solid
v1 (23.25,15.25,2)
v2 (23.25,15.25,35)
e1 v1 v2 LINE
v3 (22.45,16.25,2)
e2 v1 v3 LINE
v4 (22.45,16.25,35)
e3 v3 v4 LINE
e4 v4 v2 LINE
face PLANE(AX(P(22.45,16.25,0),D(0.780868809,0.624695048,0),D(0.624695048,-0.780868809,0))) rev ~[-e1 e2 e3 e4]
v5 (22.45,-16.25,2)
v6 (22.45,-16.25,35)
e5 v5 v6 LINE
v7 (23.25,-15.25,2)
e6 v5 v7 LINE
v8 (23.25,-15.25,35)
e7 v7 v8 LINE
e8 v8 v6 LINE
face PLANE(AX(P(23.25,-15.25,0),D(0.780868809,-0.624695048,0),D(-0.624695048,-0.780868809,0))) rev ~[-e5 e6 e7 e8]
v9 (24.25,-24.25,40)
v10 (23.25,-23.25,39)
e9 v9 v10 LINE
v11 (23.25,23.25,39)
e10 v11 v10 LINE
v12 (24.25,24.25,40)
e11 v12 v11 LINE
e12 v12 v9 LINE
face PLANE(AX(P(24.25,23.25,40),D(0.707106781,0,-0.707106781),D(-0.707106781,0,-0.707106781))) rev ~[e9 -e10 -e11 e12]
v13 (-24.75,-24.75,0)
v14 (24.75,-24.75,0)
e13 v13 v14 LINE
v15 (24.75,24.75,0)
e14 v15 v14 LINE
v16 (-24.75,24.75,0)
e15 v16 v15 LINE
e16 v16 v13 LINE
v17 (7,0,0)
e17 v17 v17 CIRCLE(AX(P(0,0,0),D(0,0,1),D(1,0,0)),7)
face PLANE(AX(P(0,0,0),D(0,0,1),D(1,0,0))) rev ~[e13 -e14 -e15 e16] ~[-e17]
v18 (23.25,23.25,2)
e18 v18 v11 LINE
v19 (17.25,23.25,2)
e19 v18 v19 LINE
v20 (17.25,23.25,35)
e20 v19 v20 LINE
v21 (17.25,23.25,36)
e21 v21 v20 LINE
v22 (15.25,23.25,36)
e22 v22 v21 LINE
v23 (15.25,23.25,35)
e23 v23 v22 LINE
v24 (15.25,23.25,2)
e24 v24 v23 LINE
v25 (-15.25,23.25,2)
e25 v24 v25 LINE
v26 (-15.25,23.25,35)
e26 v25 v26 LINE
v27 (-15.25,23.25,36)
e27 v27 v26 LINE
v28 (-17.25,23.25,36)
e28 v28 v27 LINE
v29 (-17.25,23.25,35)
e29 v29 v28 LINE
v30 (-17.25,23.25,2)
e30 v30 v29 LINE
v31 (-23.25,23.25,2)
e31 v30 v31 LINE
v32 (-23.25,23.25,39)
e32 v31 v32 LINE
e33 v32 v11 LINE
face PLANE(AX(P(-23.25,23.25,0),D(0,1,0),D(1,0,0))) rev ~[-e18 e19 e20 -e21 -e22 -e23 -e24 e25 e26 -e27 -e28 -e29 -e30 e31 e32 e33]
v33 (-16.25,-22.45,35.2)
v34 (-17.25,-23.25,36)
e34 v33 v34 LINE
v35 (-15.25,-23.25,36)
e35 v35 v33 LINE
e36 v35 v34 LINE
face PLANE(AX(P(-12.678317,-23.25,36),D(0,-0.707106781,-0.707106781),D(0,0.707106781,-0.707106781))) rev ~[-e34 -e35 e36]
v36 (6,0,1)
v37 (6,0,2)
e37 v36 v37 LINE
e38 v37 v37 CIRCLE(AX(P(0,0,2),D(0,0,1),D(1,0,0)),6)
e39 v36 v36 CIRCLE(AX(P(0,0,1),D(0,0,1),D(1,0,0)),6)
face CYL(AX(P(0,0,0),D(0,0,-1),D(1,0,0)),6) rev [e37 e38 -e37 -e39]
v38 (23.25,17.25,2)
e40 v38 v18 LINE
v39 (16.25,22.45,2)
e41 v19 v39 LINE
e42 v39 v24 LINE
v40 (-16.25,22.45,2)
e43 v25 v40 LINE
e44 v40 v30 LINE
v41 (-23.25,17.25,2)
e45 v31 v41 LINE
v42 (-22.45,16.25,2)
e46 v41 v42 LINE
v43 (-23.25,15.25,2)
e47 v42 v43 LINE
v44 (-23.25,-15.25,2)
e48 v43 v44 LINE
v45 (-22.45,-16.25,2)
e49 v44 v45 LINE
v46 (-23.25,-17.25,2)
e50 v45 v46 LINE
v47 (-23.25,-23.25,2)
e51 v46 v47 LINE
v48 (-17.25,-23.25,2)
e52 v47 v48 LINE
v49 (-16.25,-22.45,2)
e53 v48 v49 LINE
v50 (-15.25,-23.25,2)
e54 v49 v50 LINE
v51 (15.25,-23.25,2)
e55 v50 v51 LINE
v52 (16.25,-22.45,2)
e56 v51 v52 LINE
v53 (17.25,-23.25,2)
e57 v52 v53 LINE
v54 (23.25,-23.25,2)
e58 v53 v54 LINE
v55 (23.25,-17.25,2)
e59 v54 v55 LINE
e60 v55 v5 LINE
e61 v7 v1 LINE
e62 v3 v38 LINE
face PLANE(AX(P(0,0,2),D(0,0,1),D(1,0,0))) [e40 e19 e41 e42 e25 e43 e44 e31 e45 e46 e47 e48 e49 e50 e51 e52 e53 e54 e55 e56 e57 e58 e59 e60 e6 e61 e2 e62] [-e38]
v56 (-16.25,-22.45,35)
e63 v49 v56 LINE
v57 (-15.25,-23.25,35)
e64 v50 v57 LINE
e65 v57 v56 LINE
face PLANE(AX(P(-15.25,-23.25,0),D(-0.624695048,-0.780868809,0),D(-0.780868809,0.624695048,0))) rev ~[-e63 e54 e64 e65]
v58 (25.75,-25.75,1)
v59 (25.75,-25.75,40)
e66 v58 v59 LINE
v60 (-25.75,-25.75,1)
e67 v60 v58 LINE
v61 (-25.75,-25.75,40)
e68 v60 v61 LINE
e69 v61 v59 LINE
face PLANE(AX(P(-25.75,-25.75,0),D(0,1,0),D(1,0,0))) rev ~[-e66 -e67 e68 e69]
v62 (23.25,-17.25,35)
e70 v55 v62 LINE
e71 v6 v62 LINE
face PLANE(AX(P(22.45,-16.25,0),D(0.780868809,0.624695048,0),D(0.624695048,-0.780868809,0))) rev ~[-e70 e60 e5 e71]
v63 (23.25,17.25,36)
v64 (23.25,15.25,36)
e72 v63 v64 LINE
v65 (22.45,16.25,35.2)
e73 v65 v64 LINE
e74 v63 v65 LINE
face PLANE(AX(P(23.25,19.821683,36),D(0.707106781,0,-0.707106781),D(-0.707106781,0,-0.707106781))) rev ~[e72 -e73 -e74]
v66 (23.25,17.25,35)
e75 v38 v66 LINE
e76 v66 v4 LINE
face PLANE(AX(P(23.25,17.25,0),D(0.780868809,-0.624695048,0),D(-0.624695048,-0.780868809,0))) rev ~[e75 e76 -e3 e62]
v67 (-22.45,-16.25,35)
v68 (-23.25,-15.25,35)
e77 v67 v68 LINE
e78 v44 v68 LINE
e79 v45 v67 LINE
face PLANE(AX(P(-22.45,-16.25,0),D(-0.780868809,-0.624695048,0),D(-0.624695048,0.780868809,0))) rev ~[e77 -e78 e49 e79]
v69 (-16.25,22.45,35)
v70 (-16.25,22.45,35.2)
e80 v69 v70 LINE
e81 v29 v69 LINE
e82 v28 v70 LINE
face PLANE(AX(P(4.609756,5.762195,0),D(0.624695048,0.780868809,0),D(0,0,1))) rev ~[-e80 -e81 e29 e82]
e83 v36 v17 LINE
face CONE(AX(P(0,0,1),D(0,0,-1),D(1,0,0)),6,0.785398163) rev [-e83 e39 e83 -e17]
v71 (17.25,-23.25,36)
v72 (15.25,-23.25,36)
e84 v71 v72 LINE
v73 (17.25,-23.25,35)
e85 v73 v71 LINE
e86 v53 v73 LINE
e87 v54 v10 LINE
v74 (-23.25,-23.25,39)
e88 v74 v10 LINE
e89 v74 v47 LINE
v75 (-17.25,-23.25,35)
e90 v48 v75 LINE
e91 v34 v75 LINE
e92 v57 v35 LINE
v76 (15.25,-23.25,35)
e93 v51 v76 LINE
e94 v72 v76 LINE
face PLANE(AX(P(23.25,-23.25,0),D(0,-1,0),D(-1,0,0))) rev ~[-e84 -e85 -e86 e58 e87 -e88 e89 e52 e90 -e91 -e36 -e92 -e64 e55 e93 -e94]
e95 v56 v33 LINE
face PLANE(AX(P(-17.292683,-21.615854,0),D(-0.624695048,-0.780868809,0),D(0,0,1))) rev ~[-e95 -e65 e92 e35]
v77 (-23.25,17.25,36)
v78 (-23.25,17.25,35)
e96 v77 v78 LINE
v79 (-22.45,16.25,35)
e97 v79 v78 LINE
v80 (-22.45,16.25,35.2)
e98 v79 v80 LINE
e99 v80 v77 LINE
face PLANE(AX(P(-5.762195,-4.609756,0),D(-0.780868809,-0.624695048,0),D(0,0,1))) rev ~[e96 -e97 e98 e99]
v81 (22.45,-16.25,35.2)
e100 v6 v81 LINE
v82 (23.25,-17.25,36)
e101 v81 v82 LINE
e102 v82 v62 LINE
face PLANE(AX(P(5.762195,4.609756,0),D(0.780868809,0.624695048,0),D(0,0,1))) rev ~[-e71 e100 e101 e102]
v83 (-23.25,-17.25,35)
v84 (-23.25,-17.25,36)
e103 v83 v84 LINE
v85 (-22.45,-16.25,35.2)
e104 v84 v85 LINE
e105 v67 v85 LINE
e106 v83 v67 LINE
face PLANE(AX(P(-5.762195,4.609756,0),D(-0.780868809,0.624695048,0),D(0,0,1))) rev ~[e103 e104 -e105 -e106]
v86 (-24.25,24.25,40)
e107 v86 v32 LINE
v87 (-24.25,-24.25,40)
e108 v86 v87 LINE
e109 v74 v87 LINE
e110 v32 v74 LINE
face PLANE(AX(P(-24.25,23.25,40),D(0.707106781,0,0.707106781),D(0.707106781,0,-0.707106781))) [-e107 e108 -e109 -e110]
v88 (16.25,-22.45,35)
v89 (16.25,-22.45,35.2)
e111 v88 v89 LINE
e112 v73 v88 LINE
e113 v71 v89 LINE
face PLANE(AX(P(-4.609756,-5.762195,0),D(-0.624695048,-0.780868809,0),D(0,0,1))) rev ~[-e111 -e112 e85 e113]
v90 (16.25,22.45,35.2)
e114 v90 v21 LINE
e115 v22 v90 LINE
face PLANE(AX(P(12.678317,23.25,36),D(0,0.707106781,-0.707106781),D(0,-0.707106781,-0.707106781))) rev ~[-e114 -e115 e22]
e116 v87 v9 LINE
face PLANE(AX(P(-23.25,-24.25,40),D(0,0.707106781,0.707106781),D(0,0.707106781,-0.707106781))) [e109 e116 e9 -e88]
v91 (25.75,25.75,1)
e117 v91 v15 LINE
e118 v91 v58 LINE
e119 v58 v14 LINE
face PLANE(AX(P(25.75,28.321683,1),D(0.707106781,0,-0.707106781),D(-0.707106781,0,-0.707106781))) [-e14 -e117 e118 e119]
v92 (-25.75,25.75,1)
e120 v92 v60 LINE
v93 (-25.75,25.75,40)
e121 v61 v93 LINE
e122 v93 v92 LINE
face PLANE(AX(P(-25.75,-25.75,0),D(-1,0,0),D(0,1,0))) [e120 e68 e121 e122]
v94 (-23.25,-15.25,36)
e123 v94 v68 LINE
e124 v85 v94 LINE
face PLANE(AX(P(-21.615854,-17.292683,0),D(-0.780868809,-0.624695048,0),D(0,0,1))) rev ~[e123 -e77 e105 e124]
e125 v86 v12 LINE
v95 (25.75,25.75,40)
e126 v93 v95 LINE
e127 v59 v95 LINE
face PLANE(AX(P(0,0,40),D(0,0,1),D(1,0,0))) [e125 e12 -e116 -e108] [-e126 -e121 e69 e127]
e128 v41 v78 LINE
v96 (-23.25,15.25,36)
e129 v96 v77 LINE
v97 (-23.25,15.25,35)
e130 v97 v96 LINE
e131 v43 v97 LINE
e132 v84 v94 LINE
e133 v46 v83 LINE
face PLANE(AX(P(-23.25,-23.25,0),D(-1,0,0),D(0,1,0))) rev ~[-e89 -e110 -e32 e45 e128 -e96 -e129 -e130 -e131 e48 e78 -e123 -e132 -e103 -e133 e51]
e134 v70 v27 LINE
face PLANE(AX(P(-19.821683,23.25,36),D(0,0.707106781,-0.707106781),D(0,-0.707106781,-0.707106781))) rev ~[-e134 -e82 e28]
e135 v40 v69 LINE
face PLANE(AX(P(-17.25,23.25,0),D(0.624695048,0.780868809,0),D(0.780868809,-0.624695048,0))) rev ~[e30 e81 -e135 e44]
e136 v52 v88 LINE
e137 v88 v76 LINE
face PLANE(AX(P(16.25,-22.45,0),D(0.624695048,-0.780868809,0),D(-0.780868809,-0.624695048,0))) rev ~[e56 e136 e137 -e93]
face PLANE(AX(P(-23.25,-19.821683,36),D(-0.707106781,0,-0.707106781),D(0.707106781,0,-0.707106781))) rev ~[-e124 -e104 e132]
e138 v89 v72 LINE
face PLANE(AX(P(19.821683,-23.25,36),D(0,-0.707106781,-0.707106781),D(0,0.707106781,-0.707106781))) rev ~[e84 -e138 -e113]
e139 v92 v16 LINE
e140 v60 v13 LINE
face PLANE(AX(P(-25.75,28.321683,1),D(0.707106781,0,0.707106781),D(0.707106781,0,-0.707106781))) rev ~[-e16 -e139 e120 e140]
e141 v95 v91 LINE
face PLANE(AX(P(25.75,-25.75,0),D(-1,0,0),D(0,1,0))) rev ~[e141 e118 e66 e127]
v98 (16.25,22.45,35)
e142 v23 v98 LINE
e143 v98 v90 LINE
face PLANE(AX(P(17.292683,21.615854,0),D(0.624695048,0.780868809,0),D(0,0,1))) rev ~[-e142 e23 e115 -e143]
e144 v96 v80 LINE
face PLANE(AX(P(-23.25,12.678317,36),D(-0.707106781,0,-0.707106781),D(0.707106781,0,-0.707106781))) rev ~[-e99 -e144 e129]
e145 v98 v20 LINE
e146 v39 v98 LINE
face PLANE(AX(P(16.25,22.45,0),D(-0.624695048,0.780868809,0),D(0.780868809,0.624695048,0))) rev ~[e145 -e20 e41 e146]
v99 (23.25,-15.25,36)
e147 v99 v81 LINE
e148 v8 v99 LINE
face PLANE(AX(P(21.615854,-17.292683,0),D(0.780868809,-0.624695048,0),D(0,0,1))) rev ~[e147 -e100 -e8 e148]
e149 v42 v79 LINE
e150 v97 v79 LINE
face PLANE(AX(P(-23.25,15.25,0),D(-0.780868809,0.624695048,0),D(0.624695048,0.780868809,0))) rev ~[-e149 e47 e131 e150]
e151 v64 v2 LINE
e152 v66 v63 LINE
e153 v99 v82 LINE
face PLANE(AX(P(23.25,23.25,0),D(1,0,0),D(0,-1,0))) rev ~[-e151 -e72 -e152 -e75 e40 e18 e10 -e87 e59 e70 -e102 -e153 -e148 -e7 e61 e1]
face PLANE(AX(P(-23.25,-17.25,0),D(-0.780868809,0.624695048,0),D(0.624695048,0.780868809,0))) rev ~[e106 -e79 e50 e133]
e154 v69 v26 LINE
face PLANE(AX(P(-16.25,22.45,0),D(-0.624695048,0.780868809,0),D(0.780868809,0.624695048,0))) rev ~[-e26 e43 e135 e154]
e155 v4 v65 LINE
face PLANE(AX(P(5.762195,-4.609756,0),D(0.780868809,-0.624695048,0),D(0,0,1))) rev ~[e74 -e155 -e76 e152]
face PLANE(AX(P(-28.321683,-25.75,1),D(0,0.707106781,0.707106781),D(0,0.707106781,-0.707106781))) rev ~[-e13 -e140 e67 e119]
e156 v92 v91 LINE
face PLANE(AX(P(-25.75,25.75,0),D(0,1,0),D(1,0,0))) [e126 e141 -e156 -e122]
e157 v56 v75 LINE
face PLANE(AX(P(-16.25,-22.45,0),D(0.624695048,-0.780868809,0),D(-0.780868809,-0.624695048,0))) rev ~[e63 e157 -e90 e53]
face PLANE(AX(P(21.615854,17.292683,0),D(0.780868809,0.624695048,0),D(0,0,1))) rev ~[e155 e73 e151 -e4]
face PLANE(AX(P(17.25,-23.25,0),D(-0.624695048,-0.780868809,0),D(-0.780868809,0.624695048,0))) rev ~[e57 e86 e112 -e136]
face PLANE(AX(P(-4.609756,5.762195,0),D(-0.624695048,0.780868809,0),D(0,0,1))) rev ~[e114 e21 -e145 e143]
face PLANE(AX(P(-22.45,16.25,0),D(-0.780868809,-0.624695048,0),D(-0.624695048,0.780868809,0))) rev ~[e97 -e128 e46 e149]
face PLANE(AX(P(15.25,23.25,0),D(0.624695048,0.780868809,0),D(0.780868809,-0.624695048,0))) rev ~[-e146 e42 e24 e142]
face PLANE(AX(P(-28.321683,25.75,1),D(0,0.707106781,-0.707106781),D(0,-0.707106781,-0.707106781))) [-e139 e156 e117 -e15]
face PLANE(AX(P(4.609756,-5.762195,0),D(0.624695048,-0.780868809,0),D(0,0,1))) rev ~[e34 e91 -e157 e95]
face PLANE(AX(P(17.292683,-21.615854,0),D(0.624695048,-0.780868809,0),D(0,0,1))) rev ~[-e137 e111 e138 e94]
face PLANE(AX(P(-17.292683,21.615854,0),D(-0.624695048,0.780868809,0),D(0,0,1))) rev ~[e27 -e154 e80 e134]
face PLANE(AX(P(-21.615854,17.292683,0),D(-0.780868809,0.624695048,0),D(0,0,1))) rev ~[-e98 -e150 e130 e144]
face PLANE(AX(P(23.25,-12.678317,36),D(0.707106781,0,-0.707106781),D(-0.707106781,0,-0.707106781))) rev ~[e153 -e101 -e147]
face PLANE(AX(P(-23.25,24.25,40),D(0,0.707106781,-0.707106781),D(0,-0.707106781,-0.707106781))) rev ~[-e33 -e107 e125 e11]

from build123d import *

# Parameters (mm, degrees)
F0_W          = 51.5
F0_H          = 51.5
F1_DEPTH      = 40
F2_DEPTH      = 35
F0_R          = 6
F3_DEPTH      = 2
F4_T4_DEPTH   = 7.1433659759
F4_T10_DEPTH  = 7.1433659759
F4_T16_DEPTH  = 7.1433659759
F4_T22_DEPTH  = 7.1433659759
F4_T28_DEPTH  = 7.1433659759
F4_T34_DEPTH  = 7.1433659759
F4_T40_DEPTH  = 7.1433659759
F4_T46_DEPTH  = 7.1433659759
F4_T49_DEPTH  = 46.5
F4_T51_DEPTH  = 46.5
F4_T53_DEPTH  = 56.6433659759
F4_T55_DEPTH  = 56.6433659759
F4_T63_DEPTH  = 49.071682988
F4_T67_DEPTH  = 49.071682988
F4_T74_DEPTH  = 49.071682988
F4_T78_DEPTH  = 49.071682988
F4_T85_DEPTH  = 49.071682988
F4_T89_DEPTH  = 49.071682988
F4_T96_DEPTH  = 49.071682988
F4_T100_DEPTH = 49.071682988


# Not quite as in the source:
# - a fillet or chamfer that OpenCascade refuses, or shapes differently, is made with other operations: its cross-section is extruded or revolved along the edge and cut away or added


with BuildPart() as f1:
    # F0 (on Top) → F1 (new body)
    with BuildSketch(Plane.XY):
        Rectangle(F0_W, F0_H)
        Polygon((-23.25, 17.25), (-23.25, 23.25), (-17.25, 23.25), (-15.25, 23.25), (15.25, 23.25), (17.25, 23.25), (23.25, 23.25), (23.25, 17.25), (23.25, 15.25), (23.25, -15.25), (23.25, -17.25), (23.25, -23.25), (17.25, -23.25), (15.25, -23.25), (-15.25, -23.25), (-17.25, -23.25), (-23.25, -23.25), (-23.25, -17.25), (-23.25, -15.25), (-23.25, 15.25), align=None, mode=Mode.SUBTRACT)
    extrude(amount=F1_DEPTH)

    # F0 (on Top) → F2 (join)
    with BuildSketch(Plane.XY):
        Rectangle(F0_W, F0_H)
        Polygon((-23.25, 17.25), (-23.25, 23.25), (-17.25, 23.25), (-15.25, 23.25), (15.25, 23.25), (17.25, 23.25), (23.25, 23.25), (23.25, 17.25), (23.25, 15.25), (23.25, -15.25), (23.25, -17.25), (23.25, -23.25), (17.25, -23.25), (15.25, -23.25), (-15.25, -23.25), (-17.25, -23.25), (-23.25, -23.25), (-23.25, -17.25), (-23.25, -15.25), (-23.25, 15.25), align=None, mode=Mode.SUBTRACT)
        Polygon((-22.45, 16.25), (-23.25, 17.25), (-23.25, 15.25), align=None)
        Polygon((-15.25, 23.25), (-17.25, 23.25), (-16.25, 22.45), align=None)
        Polygon((17.25, 23.25), (15.25, 23.25), (16.25, 22.45), align=None)
        Polygon((23.25, 15.25), (23.25, 17.25), (22.45, 16.25), align=None)
        Polygon((23.25, -17.25), (23.25, -15.25), (22.45, -16.25), align=None)
        Polygon((16.25, -22.45), (15.25, -23.25), (17.25, -23.25), align=None)
        Polygon((-16.25, -22.45), (-17.25, -23.25), (-15.25, -23.25), align=None)
        Polygon((-22.45, -16.25), (-23.25, -15.25), (-23.25, -17.25), align=None)
    extrude(amount=F2_DEPTH)

    # F0 (on Top) → F3 (join)
    with BuildSketch(Plane.XY):
        Polygon((-17.25, 23.25), (-23.25, 23.25), (-23.25, 17.25), (-22.45, 16.25), (-23.25, 15.25), (-23.25, -15.25), (-22.45, -16.25), (-23.25, -17.25), (-23.25, -23.25), (-17.25, -23.25), (-16.25, -22.45), (-15.25, -23.25), (15.25, -23.25), (16.25, -22.45), (17.25, -23.25), (23.25, -23.25), (23.25, -17.25), (22.45, -16.25), (23.25, -15.25), (23.25, 15.25), (22.45, 16.25), (23.25, 17.25), (23.25, 23.25), (17.25, 23.25), (16.25, 22.45), (15.25, 23.25), (-15.25, 23.25), (-16.25, 22.45), align=None)
        Circle(F0_R, mode=Mode.SUBTRACT)
    extrude(amount=F3_DEPTH)

    # F4: chamfer of 1 on 17 edges, made by hand


with BuildPart() as f4_tool2:
    # F4_s3 → F4_t4 (new body)
    with BuildSketch(Plane.YZ.offset(12.678317012)):
        Polygon((23.25, 36), (22.25, 35), (23.25, 35), align=None)
    extrude(amount=F4_T4_DEPTH)

    split(bisect_by=Plane(origin=(17.2926829268, 21.6158536585, 0), x_dir=(0, 0, 1), z_dir=(0.6246950476, 0.7808688094, 0)), keep=Keep.TOP)

    split(bisect_by=Plane(origin=(-4.6097560976, 5.762195122, 0), x_dir=(0, 0, 1), z_dir=(-0.6246950476, 0.7808688094, 0)), keep=Keep.TOP)


with BuildPart() as f1_1:
    add(f1.part)

    # F4_t1: union F4_tool2
    add(f4_tool2.part)


with BuildPart() as f4_tool8:
    # F4_s9 → F4_t10 (new body)
    with BuildSketch(Plane.YZ.offset(-19.821682988)):
        Polygon((23.25, 36), (22.25, 35), (23.25, 35), align=None)
    extrude(amount=F4_T10_DEPTH)

    split(bisect_by=Plane(origin=(4.6097560976, 5.762195122, 0), x_dir=(0, 0, 1), z_dir=(0.6246950476, 0.7808688094, 0)), keep=Keep.TOP)

    split(bisect_by=Plane(origin=(-17.2926829268, 21.6158536585, 0), x_dir=(0, 0, 1), z_dir=(-0.6246950476, 0.7808688094, 0)), keep=Keep.TOP)


with BuildPart() as f1_2:
    add(f1_1.part)

    # F4_t7: union F4_tool8
    add(f4_tool8.part)


with BuildPart() as f4_tool14:
    # F4_s15 → F4_t16 (new body)
    with BuildSketch(Plane.XZ.offset(12.678317012)):
        Polygon((23.25, 36), (22.25, 35), (23.25, 35), align=None)
    extrude(amount=F4_T16_DEPTH)

    split(bisect_by=Plane(origin=(21.6158536585, -17.2926829268, 0), x_dir=(0, 0, 1), z_dir=(0.7808688094, -0.6246950476, 0)), keep=Keep.TOP)

    split(bisect_by=Plane(origin=(5.762195122, 4.6097560976, 0), x_dir=(0, 0, 1), z_dir=(0.7808688094, 0.6246950476, 0)), keep=Keep.TOP)


with BuildPart() as f1_3:
    add(f1_2.part)

    # F4_t13: union F4_tool14
    add(f4_tool14.part)


with BuildPart() as f4_tool20:
    # F4_s21 → F4_t22 (new body)
    with BuildSketch(Plane.XZ.offset(-19.821682988)):
        Polygon((23.25, 36), (22.25, 35), (23.25, 35), align=None)
    extrude(amount=F4_T22_DEPTH)

    split(bisect_by=Plane(origin=(5.762195122, -4.6097560976, 0), x_dir=(0, 0, 1), z_dir=(0.7808688094, -0.6246950476, 0)), keep=Keep.TOP)

    split(bisect_by=Plane(origin=(21.6158536585, 17.2926829268, 0), x_dir=(0, 0, 1), z_dir=(0.7808688094, 0.6246950476, 0)), keep=Keep.TOP)


with BuildPart() as f1_4:
    add(f1_3.part)

    # F4_t19: union F4_tool20
    add(f4_tool20.part)


with BuildPart() as f4_tool26:
    # F4_s27 → F4_t28 (new body)
    with BuildSketch(Plane.XZ.offset(-12.678317012)):
        Polygon((-23.25, 36), (-22.25, 35), (-23.25, 35), align=None)
    extrude(amount=-F4_T28_DEPTH)

    split(bisect_by=Plane(origin=(-21.6158536585, 17.2926829268, 0), x_dir=(0, 0, 1), z_dir=(-0.7808688094, 0.6246950476, 0)), keep=Keep.TOP)

    split(bisect_by=Plane(origin=(-5.762195122, -4.6097560976, 0), x_dir=(0, 0, 1), z_dir=(-0.7808688094, -0.6246950476, 0)), keep=Keep.TOP)


with BuildPart() as f1_5:
    add(f1_4.part)

    # F4_t25: union F4_tool26
    add(f4_tool26.part)


with BuildPart() as f4_tool32:
    # F4_s33 → F4_t34 (new body)
    with BuildSketch(Plane.XZ.offset(19.821682988)):
        Polygon((-23.25, 36), (-22.25, 35), (-23.25, 35), align=None)
    extrude(amount=-F4_T34_DEPTH)

    split(bisect_by=Plane(origin=(-5.762195122, 4.6097560976, 0), x_dir=(0, 0, 1), z_dir=(-0.7808688094, 0.6246950476, 0)), keep=Keep.TOP)

    split(bisect_by=Plane(origin=(-21.6158536585, -17.2926829268, 0), x_dir=(0, 0, 1), z_dir=(-0.7808688094, -0.6246950476, 0)), keep=Keep.TOP)


with BuildPart() as f1_6:
    add(f1_5.part)

    # F4_t31: union F4_tool32
    add(f4_tool32.part)


with BuildPart() as f4_tool38:
    # F4_s39 → F4_t40 (new body)
    with BuildSketch(Plane.YZ.offset(-12.678317012)):
        Polygon((-23.25, 36), (-22.25, 35), (-23.25, 35), align=None)
    extrude(amount=-F4_T40_DEPTH)

    split(bisect_by=Plane(origin=(-17.2926829268, -21.6158536585, 0), x_dir=(0, 0, 1), z_dir=(-0.6246950476, -0.7808688094, 0)), keep=Keep.TOP)

    split(bisect_by=Plane(origin=(4.6097560976, -5.762195122, 0), x_dir=(0, 0, 1), z_dir=(0.6246950476, -0.7808688094, 0)), keep=Keep.TOP)


with BuildPart() as f1_7:
    add(f1_6.part)

    # F4_t37: union F4_tool38
    add(f4_tool38.part)


with BuildPart() as f4_tool44:
    # F4_s45 → F4_t46 (new body)
    with BuildSketch(Plane.YZ.offset(19.821682988)):
        Polygon((-23.25, 36), (-22.25, 35), (-23.25, 35), align=None)
    extrude(amount=-F4_T46_DEPTH)

    split(bisect_by=Plane(origin=(-4.6097560976, -5.762195122, 0), x_dir=(0, 0, 1), z_dir=(-0.6246950476, -0.7808688094, 0)), keep=Keep.TOP)

    split(bisect_by=Plane(origin=(17.2926829268, -21.6158536585, 0), x_dir=(0, 0, 1), z_dir=(0.6246950476, -0.7808688094, 0)), keep=Keep.TOP)


with BuildPart() as f1_8:
    add(f1_7.part)

    # F4_t43: union F4_tool44
    add(f4_tool44.part)

    # F4_s50 → F4_t49 (cut)
    with BuildSketch(Plane.YZ.offset(-23.25)):
        Polygon((24.25, 40), (23.25, 39), (23.25, 40), align=None)
        Polygon((-24.25, 40), (-23.25, 39), (-23.25, 40), align=None)
    extrude(amount=F4_T49_DEPTH, mode=Mode.SUBTRACT)

    # F4_s52 → F4_t51 (cut)
    with BuildSketch(Plane.XZ.offset(-23.25)):
        Polygon((-24.25, 40), (-23.25, 39), (-23.25, 40), align=None)
        Polygon((24.25, 40), (23.25, 39), (23.25, 40), align=None)
    extrude(amount=F4_T51_DEPTH, mode=Mode.SUBTRACT)

    # F4_s54 → F4_t53 (cut)
    with BuildSketch(Plane.YZ.offset(-28.321682988)):
        Polygon((25.75, 1), (24.75, 0), (25.75, 0), align=None)
        Polygon((-25.75, 1), (-24.75, 0), (-25.75, 0), align=None)
    extrude(amount=F4_T53_DEPTH, mode=Mode.SUBTRACT)

    # F4_s56 → F4_t55 (cut)
    with BuildSketch(Plane.XZ.offset(-28.321682988)):
        Polygon((-25.75, 1), (-24.75, 0), (-25.75, 0), align=None)
        Polygon((25.75, 1), (24.75, 0), (25.75, 0), align=None)
    extrude(amount=F4_T55_DEPTH, mode=Mode.SUBTRACT)

    # F4_s57 → F4_t58 (revolve, cut)
    with BuildSketch(Plane.XZ):
        Polygon((6, 1), (7, 0), (6, 0), align=None)
    revolve(axis=Axis((0, 0, 0), (0, 0, 1)), mode=Mode.SUBTRACT)


with BuildPart() as f4_tool61:
    # F4_s62 → F4_t63 (new body)
    with BuildSketch(Plane.YZ.offset(25.821682988)):
        Polygon((24.25, 40), (23.25, 39), (23.25, 40), align=None)
    extrude(amount=-F4_T63_DEPTH)

    split(bisect_by=Plane.YZ.offset(23.25), keep=Keep.TOP)


with BuildPart() as f4_tool65:
    # F4_s66 → F4_t67 (new body)
    with BuildSketch(Plane.XZ.offset(23.25)):
        Polygon((24.25, 40), (23.25, 39), (23.25, 40), align=None)
    extrude(amount=-F4_T67_DEPTH)

    split(bisect_by=Plane.XZ.offset(-23.25), keep=Keep.BOTTOM)


with BuildPart() as f4_tool61_1:
    add(f4_tool61.part)

    # F4_t69: intersect F4_tool65
    add(f4_tool65.part, mode=Mode.INTERSECT)


with BuildPart() as f1_9:
    add(f1_8.part)

    # F4_t59: cut F4_tool61
    add(f4_tool61_1.part, mode=Mode.SUBTRACT)


with BuildPart() as f4_tool72:
    # F4_s73 → F4_t74 (new body)
    with BuildSketch(Plane.XZ.offset(-25.821682988)):
        Polygon((-24.25, 40), (-23.25, 39), (-23.25, 40), align=None)
    extrude(amount=F4_T74_DEPTH)

    split(bisect_by=Plane.XZ.offset(-23.25), keep=Keep.BOTTOM)


with BuildPart() as f4_tool76:
    # F4_s77 → F4_t78 (new body)
    with BuildSketch(Plane.YZ.offset(23.25)):
        Polygon((24.25, 40), (23.25, 39), (23.25, 40), align=None)
    extrude(amount=-F4_T78_DEPTH)

    split(bisect_by=Plane.YZ.offset(-23.25), keep=Keep.BOTTOM)


with BuildPart() as f4_tool72_1:
    add(f4_tool72.part)

    # F4_t80: intersect F4_tool76
    add(f4_tool76.part, mode=Mode.INTERSECT)


with BuildPart() as f1_10:
    add(f1_9.part)

    # F4_t70: cut F4_tool72
    add(f4_tool72_1.part, mode=Mode.SUBTRACT)


with BuildPart() as f4_tool83:
    # F4_s84 → F4_t85 (new body)
    with BuildSketch(Plane.XZ.offset(-23.25)):
        Polygon((-24.25, 40), (-23.25, 39), (-23.25, 40), align=None)
    extrude(amount=F4_T85_DEPTH)

    split(bisect_by=Plane.XZ.offset(23.25), keep=Keep.TOP)


with BuildPart() as f4_tool87:
    # F4_s88 → F4_t89 (new body)
    with BuildSketch(Plane.YZ.offset(-25.821682988)):
        Polygon((-24.25, 40), (-23.25, 39), (-23.25, 40), align=None)
    extrude(amount=F4_T89_DEPTH)

    split(bisect_by=Plane.YZ.offset(-23.25), keep=Keep.BOTTOM)


with BuildPart() as f4_tool83_1:
    add(f4_tool83.part)

    # F4_t91: intersect F4_tool87
    add(f4_tool87.part, mode=Mode.INTERSECT)


with BuildPart() as f1_11:
    add(f1_10.part)

    # F4_t81: cut F4_tool83
    add(f4_tool83_1.part, mode=Mode.SUBTRACT)


with BuildPart() as f4_tool94:
    # F4_s95 → F4_t96 (new body)
    with BuildSketch(Plane.XZ.offset(25.821682988)):
        Polygon((24.25, 40), (23.25, 39), (23.25, 40), align=None)
    extrude(amount=-F4_T96_DEPTH)

    split(bisect_by=Plane.XZ.offset(23.25), keep=Keep.TOP)


with BuildPart() as f4_tool98:
    # F4_s99 → F4_t100 (new body)
    with BuildSketch(Plane.YZ.offset(-23.25)):
        Polygon((-24.25, 40), (-23.25, 39), (-23.25, 40), align=None)
    extrude(amount=F4_T100_DEPTH)

    split(bisect_by=Plane.YZ.offset(23.25), keep=Keep.TOP)


with BuildPart() as f4_tool94_1:
    add(f4_tool94.part)

    # F4_t102: intersect F4_tool98
    add(f4_tool98.part, mode=Mode.INTERSECT)


with BuildPart() as f1_12:
    add(f1_11.part)

    # F4_t92: cut F4_tool94
    add(f4_tool94_1.part, mode=Mode.SUBTRACT)


solid = f1_12.part
